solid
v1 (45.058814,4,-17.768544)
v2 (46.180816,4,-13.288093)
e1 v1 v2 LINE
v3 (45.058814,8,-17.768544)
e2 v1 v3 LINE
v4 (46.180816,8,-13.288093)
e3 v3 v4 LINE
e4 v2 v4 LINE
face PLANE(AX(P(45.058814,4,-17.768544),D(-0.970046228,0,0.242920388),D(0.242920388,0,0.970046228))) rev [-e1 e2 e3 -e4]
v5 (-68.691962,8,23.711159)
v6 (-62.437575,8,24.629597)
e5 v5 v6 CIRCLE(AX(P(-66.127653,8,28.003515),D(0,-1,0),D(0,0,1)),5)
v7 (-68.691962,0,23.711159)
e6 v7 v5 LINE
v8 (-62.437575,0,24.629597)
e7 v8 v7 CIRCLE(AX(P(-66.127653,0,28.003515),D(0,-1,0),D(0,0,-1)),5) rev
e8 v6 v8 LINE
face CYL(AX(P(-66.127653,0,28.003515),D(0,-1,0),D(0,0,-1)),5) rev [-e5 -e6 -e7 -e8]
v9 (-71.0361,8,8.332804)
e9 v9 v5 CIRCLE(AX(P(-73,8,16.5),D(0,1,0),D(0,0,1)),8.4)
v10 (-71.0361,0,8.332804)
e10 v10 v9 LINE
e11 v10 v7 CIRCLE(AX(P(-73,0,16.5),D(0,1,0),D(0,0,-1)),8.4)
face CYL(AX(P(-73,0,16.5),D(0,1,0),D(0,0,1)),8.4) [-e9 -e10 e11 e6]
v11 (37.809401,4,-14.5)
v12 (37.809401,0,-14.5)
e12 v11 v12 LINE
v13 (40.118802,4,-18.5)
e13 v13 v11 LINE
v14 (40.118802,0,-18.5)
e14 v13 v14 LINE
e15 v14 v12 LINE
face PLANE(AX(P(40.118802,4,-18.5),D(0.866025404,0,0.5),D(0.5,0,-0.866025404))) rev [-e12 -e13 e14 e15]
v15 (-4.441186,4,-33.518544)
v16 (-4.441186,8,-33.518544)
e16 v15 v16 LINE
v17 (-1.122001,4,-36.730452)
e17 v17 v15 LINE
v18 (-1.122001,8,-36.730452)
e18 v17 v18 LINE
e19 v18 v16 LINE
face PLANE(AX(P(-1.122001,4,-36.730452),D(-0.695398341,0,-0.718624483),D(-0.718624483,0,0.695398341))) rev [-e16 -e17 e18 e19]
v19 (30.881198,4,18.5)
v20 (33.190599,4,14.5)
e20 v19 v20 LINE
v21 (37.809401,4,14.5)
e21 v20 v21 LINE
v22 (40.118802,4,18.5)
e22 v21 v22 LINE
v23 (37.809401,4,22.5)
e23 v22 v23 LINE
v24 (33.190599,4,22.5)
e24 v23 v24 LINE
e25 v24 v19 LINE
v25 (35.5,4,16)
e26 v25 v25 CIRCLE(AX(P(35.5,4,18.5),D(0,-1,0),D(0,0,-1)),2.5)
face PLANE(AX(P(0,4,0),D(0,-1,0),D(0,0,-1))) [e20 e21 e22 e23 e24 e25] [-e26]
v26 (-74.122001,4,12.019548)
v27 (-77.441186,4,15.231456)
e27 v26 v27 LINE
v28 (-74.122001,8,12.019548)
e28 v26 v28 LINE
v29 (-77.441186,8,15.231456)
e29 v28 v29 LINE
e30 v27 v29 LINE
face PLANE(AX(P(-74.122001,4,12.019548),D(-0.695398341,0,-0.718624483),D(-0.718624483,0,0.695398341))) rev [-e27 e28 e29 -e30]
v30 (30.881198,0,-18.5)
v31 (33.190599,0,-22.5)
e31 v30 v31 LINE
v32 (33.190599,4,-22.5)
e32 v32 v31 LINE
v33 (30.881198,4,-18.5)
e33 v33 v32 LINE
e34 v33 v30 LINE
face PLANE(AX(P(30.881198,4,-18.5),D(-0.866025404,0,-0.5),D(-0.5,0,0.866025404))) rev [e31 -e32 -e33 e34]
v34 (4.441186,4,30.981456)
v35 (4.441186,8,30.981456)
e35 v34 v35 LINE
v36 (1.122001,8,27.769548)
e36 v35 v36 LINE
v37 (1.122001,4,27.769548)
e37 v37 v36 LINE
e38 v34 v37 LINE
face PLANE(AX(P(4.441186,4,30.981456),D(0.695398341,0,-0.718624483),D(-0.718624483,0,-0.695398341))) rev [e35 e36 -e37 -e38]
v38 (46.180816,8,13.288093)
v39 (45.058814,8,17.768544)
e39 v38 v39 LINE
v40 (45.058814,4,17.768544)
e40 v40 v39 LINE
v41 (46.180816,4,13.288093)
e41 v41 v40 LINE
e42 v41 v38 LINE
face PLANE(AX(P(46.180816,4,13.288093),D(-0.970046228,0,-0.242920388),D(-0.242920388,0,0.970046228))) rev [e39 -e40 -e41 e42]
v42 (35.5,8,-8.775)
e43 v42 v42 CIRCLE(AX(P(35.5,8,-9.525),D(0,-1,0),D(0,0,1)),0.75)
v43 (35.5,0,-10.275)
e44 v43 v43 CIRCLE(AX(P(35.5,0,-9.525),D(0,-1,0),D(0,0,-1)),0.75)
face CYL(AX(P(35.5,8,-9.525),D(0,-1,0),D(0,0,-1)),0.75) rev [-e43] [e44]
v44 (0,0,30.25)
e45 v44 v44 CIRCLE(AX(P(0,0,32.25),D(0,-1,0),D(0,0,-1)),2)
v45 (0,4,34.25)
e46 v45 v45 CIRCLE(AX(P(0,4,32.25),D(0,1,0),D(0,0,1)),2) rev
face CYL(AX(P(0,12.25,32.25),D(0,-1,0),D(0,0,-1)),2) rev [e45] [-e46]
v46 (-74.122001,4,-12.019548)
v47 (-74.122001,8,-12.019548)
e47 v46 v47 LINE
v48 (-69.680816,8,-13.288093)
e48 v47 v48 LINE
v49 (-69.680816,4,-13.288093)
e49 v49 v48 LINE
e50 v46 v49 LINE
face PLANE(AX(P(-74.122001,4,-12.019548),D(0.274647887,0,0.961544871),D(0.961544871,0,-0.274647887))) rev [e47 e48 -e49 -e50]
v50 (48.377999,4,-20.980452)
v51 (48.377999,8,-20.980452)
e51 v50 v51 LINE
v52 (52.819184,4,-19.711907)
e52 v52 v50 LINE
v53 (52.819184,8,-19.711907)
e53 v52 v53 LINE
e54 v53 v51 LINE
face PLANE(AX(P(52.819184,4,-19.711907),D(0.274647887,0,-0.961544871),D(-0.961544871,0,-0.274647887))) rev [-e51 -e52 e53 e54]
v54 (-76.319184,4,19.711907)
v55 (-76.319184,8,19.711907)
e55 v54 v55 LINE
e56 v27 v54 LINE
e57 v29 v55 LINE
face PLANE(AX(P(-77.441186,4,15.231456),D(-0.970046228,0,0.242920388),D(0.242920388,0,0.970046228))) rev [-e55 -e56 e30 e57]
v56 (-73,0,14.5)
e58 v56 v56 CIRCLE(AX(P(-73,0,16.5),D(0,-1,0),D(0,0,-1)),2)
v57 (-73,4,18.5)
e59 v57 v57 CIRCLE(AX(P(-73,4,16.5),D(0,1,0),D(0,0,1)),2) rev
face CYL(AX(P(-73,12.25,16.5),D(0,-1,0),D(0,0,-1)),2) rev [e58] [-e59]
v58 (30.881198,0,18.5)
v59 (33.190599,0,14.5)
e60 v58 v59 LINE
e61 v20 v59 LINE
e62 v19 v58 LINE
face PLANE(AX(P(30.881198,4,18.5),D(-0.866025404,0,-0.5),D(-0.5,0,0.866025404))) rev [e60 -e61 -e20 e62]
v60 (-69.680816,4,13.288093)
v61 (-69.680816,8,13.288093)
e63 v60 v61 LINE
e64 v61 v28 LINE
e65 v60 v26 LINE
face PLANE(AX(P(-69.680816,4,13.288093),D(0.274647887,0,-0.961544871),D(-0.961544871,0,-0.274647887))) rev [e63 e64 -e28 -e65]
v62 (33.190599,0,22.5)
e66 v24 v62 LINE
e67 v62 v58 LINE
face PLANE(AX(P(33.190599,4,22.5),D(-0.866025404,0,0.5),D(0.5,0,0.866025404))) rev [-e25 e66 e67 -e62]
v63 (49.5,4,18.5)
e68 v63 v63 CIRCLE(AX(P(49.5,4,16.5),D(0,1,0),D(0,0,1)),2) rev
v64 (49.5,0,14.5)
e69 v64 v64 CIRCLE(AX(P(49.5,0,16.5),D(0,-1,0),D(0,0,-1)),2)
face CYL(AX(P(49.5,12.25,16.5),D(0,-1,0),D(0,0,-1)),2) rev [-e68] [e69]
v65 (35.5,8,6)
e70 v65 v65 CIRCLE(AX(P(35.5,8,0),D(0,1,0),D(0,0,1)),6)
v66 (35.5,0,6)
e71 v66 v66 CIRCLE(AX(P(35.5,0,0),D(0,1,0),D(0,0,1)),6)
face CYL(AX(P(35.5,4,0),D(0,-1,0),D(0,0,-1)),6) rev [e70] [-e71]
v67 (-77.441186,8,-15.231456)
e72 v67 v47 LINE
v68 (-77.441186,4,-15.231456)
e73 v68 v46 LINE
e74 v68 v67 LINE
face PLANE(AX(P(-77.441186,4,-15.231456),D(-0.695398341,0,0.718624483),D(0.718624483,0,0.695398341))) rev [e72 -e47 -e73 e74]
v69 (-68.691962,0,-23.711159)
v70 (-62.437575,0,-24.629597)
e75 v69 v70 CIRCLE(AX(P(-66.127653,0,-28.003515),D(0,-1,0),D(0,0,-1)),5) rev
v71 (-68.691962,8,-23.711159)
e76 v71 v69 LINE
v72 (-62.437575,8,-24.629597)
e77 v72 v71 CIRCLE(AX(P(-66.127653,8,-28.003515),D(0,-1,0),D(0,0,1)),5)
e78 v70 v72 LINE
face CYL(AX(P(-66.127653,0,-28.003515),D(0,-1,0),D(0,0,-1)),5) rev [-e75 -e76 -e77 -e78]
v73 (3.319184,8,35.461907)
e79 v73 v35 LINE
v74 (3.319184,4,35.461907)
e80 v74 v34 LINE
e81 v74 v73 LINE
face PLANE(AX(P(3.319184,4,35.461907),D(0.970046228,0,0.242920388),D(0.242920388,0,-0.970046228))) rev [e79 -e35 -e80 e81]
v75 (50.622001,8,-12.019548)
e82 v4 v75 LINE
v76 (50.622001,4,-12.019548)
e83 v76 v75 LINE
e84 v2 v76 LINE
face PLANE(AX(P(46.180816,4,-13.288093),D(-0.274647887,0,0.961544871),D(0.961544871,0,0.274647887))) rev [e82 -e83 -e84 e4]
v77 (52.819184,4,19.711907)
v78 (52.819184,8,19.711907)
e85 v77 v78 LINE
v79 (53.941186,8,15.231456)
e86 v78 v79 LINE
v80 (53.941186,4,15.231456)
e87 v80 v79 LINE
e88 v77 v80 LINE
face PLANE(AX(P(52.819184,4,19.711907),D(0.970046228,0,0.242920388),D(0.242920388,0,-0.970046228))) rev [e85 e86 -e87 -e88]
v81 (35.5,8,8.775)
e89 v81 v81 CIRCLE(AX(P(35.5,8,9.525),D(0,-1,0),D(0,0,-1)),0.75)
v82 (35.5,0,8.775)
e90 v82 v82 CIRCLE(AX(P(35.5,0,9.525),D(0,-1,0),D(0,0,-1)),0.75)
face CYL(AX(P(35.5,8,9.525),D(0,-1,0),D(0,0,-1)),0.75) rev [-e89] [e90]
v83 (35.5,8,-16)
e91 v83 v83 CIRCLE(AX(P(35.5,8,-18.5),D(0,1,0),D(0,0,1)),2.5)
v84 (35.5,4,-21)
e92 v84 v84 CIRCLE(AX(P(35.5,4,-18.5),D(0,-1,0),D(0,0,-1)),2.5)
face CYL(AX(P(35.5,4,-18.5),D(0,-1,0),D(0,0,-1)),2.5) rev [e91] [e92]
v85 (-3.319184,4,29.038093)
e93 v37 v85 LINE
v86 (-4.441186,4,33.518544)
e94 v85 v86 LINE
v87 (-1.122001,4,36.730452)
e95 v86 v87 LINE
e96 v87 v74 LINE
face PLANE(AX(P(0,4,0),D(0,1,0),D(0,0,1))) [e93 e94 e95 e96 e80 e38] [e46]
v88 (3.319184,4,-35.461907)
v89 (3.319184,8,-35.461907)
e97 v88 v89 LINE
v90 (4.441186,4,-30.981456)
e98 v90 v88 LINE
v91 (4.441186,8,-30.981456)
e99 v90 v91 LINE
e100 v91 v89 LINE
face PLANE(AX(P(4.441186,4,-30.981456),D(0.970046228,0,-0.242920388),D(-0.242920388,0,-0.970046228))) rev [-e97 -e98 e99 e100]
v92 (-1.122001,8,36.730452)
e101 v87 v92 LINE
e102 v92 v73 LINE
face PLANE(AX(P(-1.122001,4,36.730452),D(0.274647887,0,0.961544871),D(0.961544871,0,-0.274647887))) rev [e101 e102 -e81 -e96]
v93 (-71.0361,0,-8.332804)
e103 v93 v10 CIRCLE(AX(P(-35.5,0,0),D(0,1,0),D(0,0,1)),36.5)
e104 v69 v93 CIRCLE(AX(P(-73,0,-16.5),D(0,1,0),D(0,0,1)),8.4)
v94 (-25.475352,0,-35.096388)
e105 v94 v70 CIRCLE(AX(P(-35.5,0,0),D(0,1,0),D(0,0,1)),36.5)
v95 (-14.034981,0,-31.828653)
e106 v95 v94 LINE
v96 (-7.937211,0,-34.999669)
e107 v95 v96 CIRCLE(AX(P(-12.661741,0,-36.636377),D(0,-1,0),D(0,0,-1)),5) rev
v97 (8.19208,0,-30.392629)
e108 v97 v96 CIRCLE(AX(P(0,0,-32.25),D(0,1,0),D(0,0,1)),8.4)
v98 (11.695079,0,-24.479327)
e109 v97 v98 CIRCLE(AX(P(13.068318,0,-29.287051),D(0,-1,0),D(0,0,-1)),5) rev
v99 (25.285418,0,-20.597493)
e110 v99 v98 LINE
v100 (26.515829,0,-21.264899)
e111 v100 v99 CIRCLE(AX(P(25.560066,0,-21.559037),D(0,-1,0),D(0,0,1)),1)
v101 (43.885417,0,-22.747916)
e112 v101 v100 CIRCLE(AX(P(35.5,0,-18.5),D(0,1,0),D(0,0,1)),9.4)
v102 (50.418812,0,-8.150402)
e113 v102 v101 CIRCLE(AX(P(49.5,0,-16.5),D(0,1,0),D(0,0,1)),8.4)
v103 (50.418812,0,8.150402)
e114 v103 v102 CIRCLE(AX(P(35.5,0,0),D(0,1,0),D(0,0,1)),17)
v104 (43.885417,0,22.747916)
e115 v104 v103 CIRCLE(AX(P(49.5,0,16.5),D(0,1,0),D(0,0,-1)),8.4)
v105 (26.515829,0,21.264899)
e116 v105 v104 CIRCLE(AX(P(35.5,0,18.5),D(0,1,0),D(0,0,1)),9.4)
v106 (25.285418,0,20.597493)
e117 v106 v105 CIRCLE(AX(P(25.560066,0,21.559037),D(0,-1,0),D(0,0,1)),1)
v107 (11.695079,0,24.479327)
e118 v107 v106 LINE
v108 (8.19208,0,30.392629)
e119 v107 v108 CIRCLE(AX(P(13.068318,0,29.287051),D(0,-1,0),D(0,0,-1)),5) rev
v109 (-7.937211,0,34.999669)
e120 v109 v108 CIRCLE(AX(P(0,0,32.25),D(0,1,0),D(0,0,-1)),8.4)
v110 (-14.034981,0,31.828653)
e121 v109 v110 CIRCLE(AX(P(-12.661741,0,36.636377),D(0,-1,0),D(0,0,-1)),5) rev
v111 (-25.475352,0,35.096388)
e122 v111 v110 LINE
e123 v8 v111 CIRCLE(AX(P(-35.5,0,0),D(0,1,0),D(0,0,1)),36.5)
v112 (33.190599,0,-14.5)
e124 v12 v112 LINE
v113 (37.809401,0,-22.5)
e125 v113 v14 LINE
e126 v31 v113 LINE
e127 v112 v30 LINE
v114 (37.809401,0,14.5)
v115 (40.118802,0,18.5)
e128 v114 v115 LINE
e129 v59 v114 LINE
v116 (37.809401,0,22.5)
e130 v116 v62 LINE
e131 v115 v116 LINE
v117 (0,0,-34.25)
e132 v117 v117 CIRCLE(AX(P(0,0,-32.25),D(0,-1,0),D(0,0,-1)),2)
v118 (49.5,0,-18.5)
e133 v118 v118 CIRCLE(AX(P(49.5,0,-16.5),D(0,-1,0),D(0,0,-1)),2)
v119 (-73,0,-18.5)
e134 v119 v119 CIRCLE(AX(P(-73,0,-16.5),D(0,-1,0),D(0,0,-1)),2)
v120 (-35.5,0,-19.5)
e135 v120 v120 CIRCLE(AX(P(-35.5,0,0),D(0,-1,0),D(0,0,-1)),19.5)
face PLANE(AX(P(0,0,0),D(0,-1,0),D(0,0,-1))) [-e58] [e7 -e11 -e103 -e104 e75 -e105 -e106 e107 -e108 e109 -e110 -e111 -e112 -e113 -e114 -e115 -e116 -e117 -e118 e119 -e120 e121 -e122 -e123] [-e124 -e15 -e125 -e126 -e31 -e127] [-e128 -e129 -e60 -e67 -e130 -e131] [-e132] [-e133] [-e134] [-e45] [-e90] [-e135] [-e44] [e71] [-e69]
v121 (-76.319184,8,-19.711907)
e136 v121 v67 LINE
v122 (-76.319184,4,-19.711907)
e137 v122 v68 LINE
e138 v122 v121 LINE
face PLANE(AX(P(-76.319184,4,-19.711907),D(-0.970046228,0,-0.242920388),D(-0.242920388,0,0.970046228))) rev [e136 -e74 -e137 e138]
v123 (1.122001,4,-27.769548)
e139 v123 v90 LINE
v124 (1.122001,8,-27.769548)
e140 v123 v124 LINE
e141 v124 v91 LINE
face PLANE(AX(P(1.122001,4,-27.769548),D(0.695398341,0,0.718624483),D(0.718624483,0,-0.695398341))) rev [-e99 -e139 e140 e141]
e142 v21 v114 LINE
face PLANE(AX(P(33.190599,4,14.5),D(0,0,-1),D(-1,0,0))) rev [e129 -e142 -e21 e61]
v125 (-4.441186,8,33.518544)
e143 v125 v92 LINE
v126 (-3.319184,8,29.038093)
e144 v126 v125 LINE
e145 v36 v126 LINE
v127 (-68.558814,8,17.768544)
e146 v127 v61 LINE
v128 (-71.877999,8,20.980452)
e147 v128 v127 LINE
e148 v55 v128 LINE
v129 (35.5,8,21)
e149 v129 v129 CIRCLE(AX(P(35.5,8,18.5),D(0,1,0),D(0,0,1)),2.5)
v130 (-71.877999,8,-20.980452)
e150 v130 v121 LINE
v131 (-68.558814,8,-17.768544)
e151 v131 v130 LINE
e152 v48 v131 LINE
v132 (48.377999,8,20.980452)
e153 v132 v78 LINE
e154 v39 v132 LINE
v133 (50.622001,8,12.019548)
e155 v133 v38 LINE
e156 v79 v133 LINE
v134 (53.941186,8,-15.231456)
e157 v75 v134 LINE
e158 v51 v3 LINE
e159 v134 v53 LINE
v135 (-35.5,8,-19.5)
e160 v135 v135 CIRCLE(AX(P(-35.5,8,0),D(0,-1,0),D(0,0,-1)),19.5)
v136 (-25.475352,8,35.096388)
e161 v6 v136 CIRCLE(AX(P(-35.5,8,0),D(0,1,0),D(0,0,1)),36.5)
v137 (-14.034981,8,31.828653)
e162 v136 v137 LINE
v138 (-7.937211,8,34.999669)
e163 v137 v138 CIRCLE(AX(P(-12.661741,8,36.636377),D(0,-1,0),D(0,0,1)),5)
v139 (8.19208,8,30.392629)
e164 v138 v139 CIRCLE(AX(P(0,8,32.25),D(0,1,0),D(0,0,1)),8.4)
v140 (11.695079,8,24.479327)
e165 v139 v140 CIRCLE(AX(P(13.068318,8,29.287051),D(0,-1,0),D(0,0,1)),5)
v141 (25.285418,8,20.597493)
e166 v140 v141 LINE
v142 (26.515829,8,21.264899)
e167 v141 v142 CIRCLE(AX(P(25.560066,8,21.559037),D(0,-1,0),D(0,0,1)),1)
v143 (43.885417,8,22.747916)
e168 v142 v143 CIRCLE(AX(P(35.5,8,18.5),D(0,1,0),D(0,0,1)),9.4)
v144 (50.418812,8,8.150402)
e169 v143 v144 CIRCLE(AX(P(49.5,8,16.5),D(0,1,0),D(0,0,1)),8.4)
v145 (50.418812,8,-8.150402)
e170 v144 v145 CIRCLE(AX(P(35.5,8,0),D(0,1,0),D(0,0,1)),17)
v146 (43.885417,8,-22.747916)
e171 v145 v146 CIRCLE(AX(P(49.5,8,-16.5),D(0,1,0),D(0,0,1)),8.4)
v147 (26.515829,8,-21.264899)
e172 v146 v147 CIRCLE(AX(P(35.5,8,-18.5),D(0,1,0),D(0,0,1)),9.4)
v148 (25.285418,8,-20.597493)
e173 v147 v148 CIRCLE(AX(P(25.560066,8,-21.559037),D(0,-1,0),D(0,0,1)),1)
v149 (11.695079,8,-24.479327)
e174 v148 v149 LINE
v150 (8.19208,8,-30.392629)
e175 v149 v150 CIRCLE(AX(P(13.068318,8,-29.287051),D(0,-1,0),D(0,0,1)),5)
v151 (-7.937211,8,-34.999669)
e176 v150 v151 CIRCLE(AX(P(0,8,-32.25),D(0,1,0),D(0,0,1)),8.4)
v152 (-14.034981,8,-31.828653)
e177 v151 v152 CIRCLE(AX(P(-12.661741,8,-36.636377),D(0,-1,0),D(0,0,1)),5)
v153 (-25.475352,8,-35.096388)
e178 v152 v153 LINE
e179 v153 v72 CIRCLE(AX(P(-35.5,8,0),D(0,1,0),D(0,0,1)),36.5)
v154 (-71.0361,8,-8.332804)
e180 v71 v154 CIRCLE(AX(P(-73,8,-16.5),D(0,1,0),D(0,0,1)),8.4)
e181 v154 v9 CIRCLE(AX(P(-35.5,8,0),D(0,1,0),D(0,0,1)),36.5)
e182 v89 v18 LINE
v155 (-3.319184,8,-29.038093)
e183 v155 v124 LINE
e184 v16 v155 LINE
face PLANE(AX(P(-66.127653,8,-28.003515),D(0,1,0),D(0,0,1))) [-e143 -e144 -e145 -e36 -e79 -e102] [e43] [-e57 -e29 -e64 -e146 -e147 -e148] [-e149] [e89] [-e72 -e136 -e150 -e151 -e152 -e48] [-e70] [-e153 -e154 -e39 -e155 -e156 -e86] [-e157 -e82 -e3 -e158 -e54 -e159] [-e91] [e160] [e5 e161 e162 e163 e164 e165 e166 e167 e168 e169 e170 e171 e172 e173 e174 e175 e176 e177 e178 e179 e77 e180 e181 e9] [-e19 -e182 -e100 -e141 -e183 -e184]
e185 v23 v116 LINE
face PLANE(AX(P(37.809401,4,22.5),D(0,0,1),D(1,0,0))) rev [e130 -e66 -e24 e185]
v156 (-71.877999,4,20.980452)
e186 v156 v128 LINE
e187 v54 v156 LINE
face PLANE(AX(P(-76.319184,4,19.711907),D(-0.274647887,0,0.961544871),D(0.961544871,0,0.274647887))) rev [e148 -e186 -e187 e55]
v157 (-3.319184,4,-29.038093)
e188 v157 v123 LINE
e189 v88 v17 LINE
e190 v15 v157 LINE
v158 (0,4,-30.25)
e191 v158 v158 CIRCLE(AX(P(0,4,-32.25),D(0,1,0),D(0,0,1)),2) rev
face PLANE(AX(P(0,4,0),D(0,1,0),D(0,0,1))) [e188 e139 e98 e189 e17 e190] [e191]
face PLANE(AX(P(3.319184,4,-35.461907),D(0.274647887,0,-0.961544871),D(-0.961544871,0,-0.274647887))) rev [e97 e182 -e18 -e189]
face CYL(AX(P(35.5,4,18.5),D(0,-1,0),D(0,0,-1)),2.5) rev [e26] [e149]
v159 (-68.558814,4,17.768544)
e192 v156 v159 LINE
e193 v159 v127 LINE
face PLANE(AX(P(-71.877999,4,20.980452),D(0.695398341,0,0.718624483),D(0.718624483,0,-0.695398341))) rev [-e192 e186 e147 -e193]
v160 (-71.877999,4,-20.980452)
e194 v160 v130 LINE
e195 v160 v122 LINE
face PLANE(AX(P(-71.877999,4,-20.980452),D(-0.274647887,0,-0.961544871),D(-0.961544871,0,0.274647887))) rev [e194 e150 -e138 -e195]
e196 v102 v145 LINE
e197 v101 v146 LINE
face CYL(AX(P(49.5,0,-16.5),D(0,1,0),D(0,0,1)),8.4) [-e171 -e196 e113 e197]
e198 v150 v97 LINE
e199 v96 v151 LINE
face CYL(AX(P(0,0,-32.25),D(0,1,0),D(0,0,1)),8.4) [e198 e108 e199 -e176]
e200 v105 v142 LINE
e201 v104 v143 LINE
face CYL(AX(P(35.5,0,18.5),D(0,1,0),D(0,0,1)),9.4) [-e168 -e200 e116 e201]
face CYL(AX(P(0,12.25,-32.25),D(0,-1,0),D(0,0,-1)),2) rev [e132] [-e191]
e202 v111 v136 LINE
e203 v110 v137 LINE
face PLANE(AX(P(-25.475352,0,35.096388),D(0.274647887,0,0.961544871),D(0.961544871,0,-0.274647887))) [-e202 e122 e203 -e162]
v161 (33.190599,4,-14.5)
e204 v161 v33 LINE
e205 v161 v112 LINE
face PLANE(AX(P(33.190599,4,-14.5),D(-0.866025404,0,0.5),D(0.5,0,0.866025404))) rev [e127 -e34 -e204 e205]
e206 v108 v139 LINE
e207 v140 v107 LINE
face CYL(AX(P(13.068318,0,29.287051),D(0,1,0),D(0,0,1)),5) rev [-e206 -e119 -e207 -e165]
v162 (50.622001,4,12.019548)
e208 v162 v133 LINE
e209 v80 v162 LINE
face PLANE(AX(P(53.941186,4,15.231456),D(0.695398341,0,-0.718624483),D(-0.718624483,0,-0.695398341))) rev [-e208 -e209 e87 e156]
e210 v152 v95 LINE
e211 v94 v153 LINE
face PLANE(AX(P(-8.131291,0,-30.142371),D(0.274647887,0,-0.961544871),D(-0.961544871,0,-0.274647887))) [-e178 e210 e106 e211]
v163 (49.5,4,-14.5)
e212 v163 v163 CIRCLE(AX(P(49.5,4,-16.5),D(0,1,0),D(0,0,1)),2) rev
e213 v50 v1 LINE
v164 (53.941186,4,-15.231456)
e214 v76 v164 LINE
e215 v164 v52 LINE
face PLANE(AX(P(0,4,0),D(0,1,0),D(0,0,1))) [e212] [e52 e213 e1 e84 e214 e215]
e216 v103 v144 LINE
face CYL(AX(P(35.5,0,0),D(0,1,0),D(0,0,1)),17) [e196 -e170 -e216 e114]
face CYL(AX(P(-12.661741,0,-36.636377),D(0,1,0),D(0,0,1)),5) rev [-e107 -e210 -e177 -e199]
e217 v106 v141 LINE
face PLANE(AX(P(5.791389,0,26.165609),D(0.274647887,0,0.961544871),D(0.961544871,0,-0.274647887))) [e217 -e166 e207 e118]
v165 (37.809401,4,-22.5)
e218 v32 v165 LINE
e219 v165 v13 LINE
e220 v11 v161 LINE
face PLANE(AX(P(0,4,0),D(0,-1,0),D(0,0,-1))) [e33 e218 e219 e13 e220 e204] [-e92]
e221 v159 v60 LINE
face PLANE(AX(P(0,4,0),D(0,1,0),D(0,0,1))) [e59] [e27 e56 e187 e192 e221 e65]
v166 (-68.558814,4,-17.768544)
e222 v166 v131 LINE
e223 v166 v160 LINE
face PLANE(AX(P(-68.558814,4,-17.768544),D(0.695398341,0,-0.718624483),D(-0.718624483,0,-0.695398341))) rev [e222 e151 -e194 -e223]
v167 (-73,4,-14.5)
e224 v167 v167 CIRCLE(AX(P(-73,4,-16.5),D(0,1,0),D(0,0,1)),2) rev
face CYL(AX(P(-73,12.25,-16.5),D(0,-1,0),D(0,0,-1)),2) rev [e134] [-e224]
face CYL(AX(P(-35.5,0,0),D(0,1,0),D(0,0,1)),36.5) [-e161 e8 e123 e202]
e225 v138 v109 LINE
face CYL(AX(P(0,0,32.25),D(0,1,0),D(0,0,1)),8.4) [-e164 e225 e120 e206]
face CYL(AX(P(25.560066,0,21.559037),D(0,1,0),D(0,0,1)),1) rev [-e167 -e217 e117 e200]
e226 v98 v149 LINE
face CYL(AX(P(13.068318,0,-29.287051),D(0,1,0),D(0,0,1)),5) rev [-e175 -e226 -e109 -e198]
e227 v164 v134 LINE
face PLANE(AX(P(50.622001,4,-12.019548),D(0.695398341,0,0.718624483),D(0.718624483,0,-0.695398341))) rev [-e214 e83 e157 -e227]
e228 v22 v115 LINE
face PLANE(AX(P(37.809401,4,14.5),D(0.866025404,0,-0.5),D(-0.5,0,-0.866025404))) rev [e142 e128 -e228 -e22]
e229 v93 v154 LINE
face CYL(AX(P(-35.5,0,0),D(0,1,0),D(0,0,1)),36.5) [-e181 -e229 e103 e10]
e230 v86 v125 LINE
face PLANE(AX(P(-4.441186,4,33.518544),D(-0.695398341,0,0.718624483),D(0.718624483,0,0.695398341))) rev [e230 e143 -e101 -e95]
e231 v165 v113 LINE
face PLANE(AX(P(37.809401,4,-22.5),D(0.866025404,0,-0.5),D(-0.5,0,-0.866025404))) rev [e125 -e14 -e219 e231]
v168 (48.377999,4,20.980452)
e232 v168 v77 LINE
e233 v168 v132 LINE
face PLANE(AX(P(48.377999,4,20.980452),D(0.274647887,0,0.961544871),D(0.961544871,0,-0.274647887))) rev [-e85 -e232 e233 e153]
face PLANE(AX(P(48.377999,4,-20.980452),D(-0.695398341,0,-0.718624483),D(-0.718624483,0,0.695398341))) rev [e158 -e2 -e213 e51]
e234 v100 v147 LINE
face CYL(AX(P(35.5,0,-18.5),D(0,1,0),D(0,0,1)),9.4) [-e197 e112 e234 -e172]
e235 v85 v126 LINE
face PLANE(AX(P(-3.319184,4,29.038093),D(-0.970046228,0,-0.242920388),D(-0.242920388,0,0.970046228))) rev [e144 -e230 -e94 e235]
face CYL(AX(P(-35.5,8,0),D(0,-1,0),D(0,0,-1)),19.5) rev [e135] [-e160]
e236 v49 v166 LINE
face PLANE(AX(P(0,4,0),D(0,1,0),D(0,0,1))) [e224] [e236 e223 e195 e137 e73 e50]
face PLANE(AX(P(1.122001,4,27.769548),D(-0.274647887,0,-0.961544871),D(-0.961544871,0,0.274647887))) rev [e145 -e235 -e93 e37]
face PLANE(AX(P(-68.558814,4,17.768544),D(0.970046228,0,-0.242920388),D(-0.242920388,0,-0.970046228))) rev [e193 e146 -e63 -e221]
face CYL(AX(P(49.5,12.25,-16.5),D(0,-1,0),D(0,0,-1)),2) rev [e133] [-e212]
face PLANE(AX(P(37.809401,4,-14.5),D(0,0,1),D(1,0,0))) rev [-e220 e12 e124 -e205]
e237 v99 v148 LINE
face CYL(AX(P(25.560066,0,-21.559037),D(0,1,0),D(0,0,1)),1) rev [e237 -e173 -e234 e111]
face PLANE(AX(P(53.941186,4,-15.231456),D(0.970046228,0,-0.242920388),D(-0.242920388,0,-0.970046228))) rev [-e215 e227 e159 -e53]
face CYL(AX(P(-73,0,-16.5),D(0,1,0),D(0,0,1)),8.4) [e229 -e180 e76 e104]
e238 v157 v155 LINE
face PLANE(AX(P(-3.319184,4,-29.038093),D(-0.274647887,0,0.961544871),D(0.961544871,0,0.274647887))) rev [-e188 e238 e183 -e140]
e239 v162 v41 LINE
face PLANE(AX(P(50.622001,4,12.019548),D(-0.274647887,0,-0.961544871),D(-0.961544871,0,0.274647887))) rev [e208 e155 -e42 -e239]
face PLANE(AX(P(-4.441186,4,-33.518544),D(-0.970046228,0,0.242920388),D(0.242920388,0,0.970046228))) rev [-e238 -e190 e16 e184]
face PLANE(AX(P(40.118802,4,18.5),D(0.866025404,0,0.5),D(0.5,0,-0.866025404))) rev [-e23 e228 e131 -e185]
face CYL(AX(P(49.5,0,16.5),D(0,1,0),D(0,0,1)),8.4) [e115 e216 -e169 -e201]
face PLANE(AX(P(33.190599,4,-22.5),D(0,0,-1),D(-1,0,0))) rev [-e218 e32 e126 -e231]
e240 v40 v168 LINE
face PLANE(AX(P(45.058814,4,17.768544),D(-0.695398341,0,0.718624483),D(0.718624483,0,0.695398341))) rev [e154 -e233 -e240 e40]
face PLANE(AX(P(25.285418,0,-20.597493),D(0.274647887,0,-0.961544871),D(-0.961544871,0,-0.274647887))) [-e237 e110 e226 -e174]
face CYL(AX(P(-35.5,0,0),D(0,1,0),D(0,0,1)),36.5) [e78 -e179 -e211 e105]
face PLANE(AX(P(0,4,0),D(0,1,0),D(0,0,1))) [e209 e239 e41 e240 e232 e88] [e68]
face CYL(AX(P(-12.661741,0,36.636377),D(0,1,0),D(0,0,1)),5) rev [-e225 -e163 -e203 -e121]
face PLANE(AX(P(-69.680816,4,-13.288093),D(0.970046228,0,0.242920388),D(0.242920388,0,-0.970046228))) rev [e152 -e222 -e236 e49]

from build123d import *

# Parameters (mm, degrees)
SKETCH1_W               = 200
SKETCH1_H               = 150
SKETCH1_R               = 6
SKETCH1_R_2             = 13.5
SKETCH1_R_3             = 2
SKETCH1_R_4             = 2.5
BOSS_EXTRUDE1_DEPTH     = 4
SKETCH3_W               = 200
SKETCH3_H               = 150
BOSS_EXTRUDE2_DEPTH     = 8.25
SKETCH6_R               = 5.4
CUT_EXTRUDE2_DEPTH      = 8.25
FILLET1_R               = 2.5
FILLET2_R               = 5
SKETCH2_R               = 4.4
SKETCH2_R_2             = 5.4
CUT_EXTRUDE1_DEPTH      = 2
CUT_EXTRUDE3_DEPTH      = 126.598815828
CUT_EXTRUDE3_DEPTH_BACK = 126.598815828
SKETCH8_R               = 2
CUT_EXTRUDE6_DEPTH      = 126.598815818
CUT_EXTRUDE6_DEPTH_BACK = 126.598815818
SKETCH13_OUTSIDE_W      = 252.06
SKETCH13_OUTSIDE_H      = 202.06
FILLET4_R               = 5
CUT_EXTRUDE7_START      = -10.25
CUT_EXTRUDE7_DEPTH      = 10.25
SKETCH17_R              = 2
BOSS_EXTRUDE3_DEPTH     = 2
SKETCH18_R              = 13.5
SKETCH18_R_2            = 2
SKETCH18_R_3            = 2.5
SKETCH18_R_4            = 6
BOSS_EXTRUDE4_DEPTH     = 6
CUT_EXTRUDE8_DEPTH      = 92.336643939
CUT_EXTRUDE8_DEPTH_BACK = 92.336643939
SKETCH19_R              = 19.5
SKETCH19_R_2            = 0.75
CUT_EXTRUDE9_DEPTH      = 4
CUT_EXTRUDE10_DEPTH     = 4


with BuildPart() as part:
    # Sketch1 → Boss-Extrude1 (new body)
    with BuildSketch(Plane(origin=(0, 0, 0), x_dir=(1, 0, 0), z_dir=(0, 1, 0))):
        Rectangle(SKETCH1_W, SKETCH1_H)
        with Locations(Location((35.5, 0, 0), (0, 0, 270))):
            Circle(SKETCH1_R, mode=Mode.SUBTRACT)
        with Locations(Location((-35.5, 0, 0), (0, 0, 270))):
            Circle(SKETCH1_R_2, mode=Mode.SUBTRACT)
        with Locations(Location((-60.5, 0, 0), (0, 0, 270))):
            Circle(SKETCH1_R_3, mode=Mode.SUBTRACT)
        with Locations(Location((-35.5, 25, 0), (0, 0, 270))):
            Circle(SKETCH1_R_3, mode=Mode.SUBTRACT)
        with Locations(Location((-10.5, 0, 0), (0, 0, 270))):
            Circle(SKETCH1_R_3, mode=Mode.SUBTRACT)
        with Locations(Location((-35.5, -25, 0), (0, 0, 270))):
            Circle(SKETCH1_R_3, mode=Mode.SUBTRACT)
        with Locations(Location((35.5, 18.5, 0), (0, 0, 270))):
            Circle(SKETCH1_R_4, mode=Mode.SUBTRACT)
        with Locations(Location((35.5, -18.5, 0), (0, 0, 90))):
            Circle(SKETCH1_R_4, mode=Mode.SUBTRACT)
        Polygon((4.517711304, -15.136418767), (0.159242352, 0.258507293), (4.681501882, 1.538807548), (9.039970835, -13.856118512), (9.584779454, -15.78048427), (5.062519924, -17.060784524), align=None, mode=Mode.SUBTRACT)
    extrude(amount=BOSS_EXTRUDE1_DEPTH)

    # Sketch3 → Boss-Extrude2 (add)
    with BuildSketch(Plane(origin=(0, 4, 0), x_dir=(1, 0, 0), z_dir=(0, 1, 0))):
        Rectangle(SKETCH3_W, SKETCH3_H)
        with BuildLine():
            Line((-26.573943662, 31.250208291), (39.070422535, 12.500083317))
            ThreePointArc((39.070422535, 12.500083317), (48.5, 0), (39.070422535, -12.500083317))
            Line((39.070422535, -12.500083317), (-26.573943662, -31.250208291))
            ThreePointArc((-26.573943662, -31.250208291), (-68, 0), (-26.573943662, 31.250208291))
        make_face(mode=Mode.SUBTRACT)
    extrude(amount=BOSS_EXTRUDE2_DEPTH)

    # Sketch6 → Cut-Extrude2 (cut)
    with BuildSketch(Plane(origin=(0, 12.25, 0), x_dir=(1, 0, 0), z_dir=(0, 1, 0))):
        with Locations((35.5, 18.5)):
            Circle(SKETCH6_R)
        with Locations((35.5, -18.5)):
            Circle(SKETCH6_R)
    extrude(amount=-CUT_EXTRUDE2_DEPTH, mode=Mode.SUBTRACT)

    # Fillet1
    # the kernel refuses this fillet: 2.5 mm, written as the material it adds along each edge
    with BuildSketch(Plane(origin=(9.584779454, 0, 15.78048427), x_dir=(-0.9621828787440704, 0, 0.2724043095323078), z_dir=(0, 1, 0)), Plane(origin=(5.062519924, 0, 17.060784524), x_dir=(-0.2724043095323296, 0, -0.9621828787440644), z_dir=(0, 1, 0)), Plane(origin=(4.681501882, 0, -1.538807548), x_dir=(0.2724043095323091, 0, 0.96218287874407), z_dir=(0, 1, 0))) as fillet1_piece_1:
        with BuildLine():
            CenterArc((FILLET1_R, -FILLET1_R), FILLET1_R, 90, 90)
            Line((0, -FILLET1_R), (0, 0))
            Line((0, 0), (FILLET1_R, 0))
        make_face()
    extrude(amount=4)
    with BuildSketch(Plane(origin=(0.159242352, 0, -0.258507293), x_dir=(0.272404309532306, 0, 0.962182878744071), z_dir=(0, 1, 0))) as fillet1_piece_2:
        with BuildLine():
            CenterArc((FILLET1_R, FILLET1_R), FILLET1_R, 180, 90)
            Line((0, FILLET1_R), (0, 0))
            Line((0, 0), (FILLET1_R, 0))
        make_face()
    extrude(amount=4)

    # Fillet2
    fillet2_edges = [part.edges().sort_by_distance(p)[0] for p in [
        (31.784909874, 8.125, 14.581058133),
        (36.584743308, 8.125, 13.210072594),
        (36.584743308, 8.125, -13.210072594),
        (31.784909874, 8.125, -14.581058133),
    ]]
    fillet(fillet2_edges, radius=FILLET2_R)

    # Sketch2 → Cut-Extrude1 (cut)
    with BuildSketch(Plane(origin=(0, 4, 0), x_dir=(1, 0, 0), z_dir=(0, 1, 0))):
        with Locations(Location((-35.5, 25, 0), (0, 0, 270))):
            Circle(SKETCH2_R)
        with Locations(Location((-10.5, 0, 0), (0, 0, 270))):
            Circle(SKETCH2_R)
        with Locations(Location((-35.5, -25, 0), (0, 0, 270))):
            Circle(SKETCH2_R)
        with Locations(Location((-60.5, 0, 0), (0, 0, 270))):
            Circle(SKETCH2_R)
        with Locations(Location((35.5, 18.5, 0), (0, 0, 270))):
            Circle(SKETCH2_R_2)
        with Locations(Location((35.5, -18.5, 0), (0, 0, 197.105868404))):
            Circle(SKETCH2_R_2)
    extrude(amount=-CUT_EXTRUDE1_DEPTH, mode=Mode.SUBTRACT)

    # Sketch8 → Cut-Extrude3 (cut, two sides: drawn at the far end of the back side and taken through both)
    with BuildSketch(Plane.XZ.offset(-CUT_EXTRUDE3_DEPTH_BACK)):
        with Locations(Location((49.5, 16.5, 0), (0, 0, 270))):
            Circle(SKETCH8_R)
        with Locations(Location((-73, 16.5, 0), (0, 0, 270))):
            Circle(SKETCH8_R)
        with Locations(Location((0, 32.25, 0), (0, 0, 270))):
            Circle(SKETCH8_R)
        with Locations(Location((-73, -16.5, 0), (0, 0, 270))):
            Circle(SKETCH8_R)
        with Locations(Location((0, -32.25, 0), (0, 0, 270))):
            Circle(SKETCH8_R)
        with Locations(Location((49.5, -16.5, 0), (0, 0, 270))):
            Circle(SKETCH8_R)
    extrude(amount=CUT_EXTRUDE3_DEPTH + CUT_EXTRUDE3_DEPTH_BACK, mode=Mode.SUBTRACT)

    # Sketch13 outside → Cut-Extrude6 (cut, two sides: drawn at the far end of the back side and taken through both)
    with BuildSketch(Plane(origin=(0, 12.25, 0), x_dir=(1, 0, 0), z_dir=(0, 1, 0)).offset(-CUT_EXTRUDE6_DEPTH_BACK)):
        Rectangle(SKETCH13_OUTSIDE_W, SKETCH13_OUTSIDE_H)
        with BuildLine():
            Line((-8.131291348, 30.142370761), (-25.475352113, 35.096387773))
            ThreePointArc((-25.475352113, 35.096387773), (-47.910899113, 34.325203324), (-65.651791262, 20.569868344))
            ThreePointArc((-65.651791262, 20.569868344), (-80.688646272, 19.88300436), (-71.036099712, 8.332803684))
            ThreePointArc((-71.036099712, 8.332803684), (-72, 0), (-71.036099712, -8.332803684))
            ThreePointArc((-71.036099712, -8.332803684), (-80.688646272, -19.88300436), (-65.651791262, -20.569868344))
            ThreePointArc((-65.651791262, -20.569868344), (-47.910899113, -34.325203324), (-25.475352113, -35.096387773))
            Line((-25.475352113, -35.096387773), (-8.131291348, -30.142370761))
            ThreePointArc((-8.131291348, -30.142370761), (2.307042254, -40.326976912), (5.791389082, -26.165609111))
            Line((5.791389082, -26.165609111), (25.285418022, -20.597492606))
            ThreePointArc((25.285418022, -20.597492606), (26.036864948, -20.680025145), (26.515828803, -21.264899257))
            ThreePointArc((26.515828803, -21.264899257), (34.700336728, -27.865924335), (43.885416553, -22.74791587))
            ThreePointArc((43.885416553, -22.74791587), (57.167099831, -19.931556524), (50.418811796, -8.150402112))
            ThreePointArc((50.418811796, -8.150402112), (52.5, 0), (50.418811796, 8.150402112))
            ThreePointArc((50.418811796, 8.150402112), (57.167099831, 19.931556524), (43.885416553, 22.74791587))
            ThreePointArc((43.885416553, 22.74791587), (34.700336728, 27.865924335), (26.515828803, 21.264899257))
            ThreePointArc((26.515828803, 21.264899257), (26.036864948, 20.680025145), (25.285418022, 20.597492606))
            Line((25.285418022, 20.597492606), (5.791389082, 26.165609111))
            ThreePointArc((5.791389082, 26.165609111), (2.307042254, 40.326976912), (-8.131291348, 30.142370761))
        make_face(mode=Mode.SUBTRACT)
    extrude(amount=CUT_EXTRUDE6_DEPTH + CUT_EXTRUDE6_DEPTH_BACK, mode=Mode.SUBTRACT)

    # Fillet4
    fillet4_edges = [part.edges().sort_by_distance(p)[0] for p in [
        (-65.651791262, 6.125, -20.569868344),
        (-8.131291348, 6.125, -30.142370761),
        (5.791389082, 6.125, -26.165609111),
        (5.791389082, 6.125, 26.165609111),
        (-8.131291348, 6.125, 30.142370761),
        (-65.651791262, 6.125, 20.569868344),
    ]]
    fillet(fillet4_edges, radius=FILLET4_R)

    # Sketch16 → Cut-Extrude7 (cut)
    with BuildSketch(Plane(origin=(0, 12.25, 0), x_dir=(1, 0, 0), z_dir=(0, 1, 0)).offset(CUT_EXTRUDE7_START)):
        with BuildLine():
            Line((-25.475352113, -35.096387773), (-14.034980843, -31.828652803))
            ThreePointArc((-14.034980843, -31.828652803), (-10.35487685, -32.200345605), (-7.937211031, -34.999669261))
            ThreePointArc((-7.937211031, -34.999669261), (2.307042254, -40.326976912), (8.192079949, -30.392629249))
            ThreePointArc((8.192079949, -30.392629249), (8.766483762, -26.738675062), (11.695078578, -24.479327069))
            Line((11.695078578, -24.479327069), (25.285418022, -20.597492606))
            ThreePointArc((25.285418022, -20.597492606), (26.036864948, -20.680025145), (26.515828803, -21.264899257))
            ThreePointArc((26.515828803, -21.264899257), (34.700336728, -27.865924335), (43.885416553, -22.74791587))
            ThreePointArc((43.885416553, -22.74791587), (57.167099831, -19.931556524), (50.418811796, -8.150402112))
            ThreePointArc((50.418811796, -8.150402112), (52.5, 0), (50.418811796, 8.150402112))
            ThreePointArc((50.418811796, 8.150402112), (57.167099831, 19.931556524), (43.885416553, 22.74791587))
            ThreePointArc((43.885416553, 22.74791587), (34.700336728, 27.865924335), (26.515828803, 21.264899257))
            ThreePointArc((26.515828803, 21.264899257), (26.036864948, 20.680025145), (25.285418022, 20.597492606))
            Line((25.285418022, 20.597492606), (11.695078578, 24.479327069))
            ThreePointArc((11.695078578, 24.479327069), (8.766483762, 26.738675062), (8.192079949, 30.392629249))
            ThreePointArc((8.192079949, 30.392629249), (2.307042254, 40.326976912), (-7.937211031, 34.999669261))
            ThreePointArc((-7.937211031, 34.999669261), (-10.35487685, 32.200345605), (-14.034980843, 31.828652803))
            Line((-14.034980843, 31.828652803), (-25.475352113, 35.096387773))
            ThreePointArc((-25.475352113, 35.096387773), (-45.44485792, 35.119080298), (-62.437574746, 24.629597374))
            ThreePointArc((-62.437574746, 24.629597374), (-65.401208588, 23.05656851), (-68.691961882, 23.711158546))
            ThreePointArc((-68.691961882, 23.711158546), (-81.304080467, 17.765799193), (-71.036099712, 8.332803684))
            ThreePointArc((-71.036099712, 8.332803684), (-72, 0), (-71.036099712, -8.332803684))
            ThreePointArc((-71.036099712, -8.332803684), (-81.304080467, -17.765799193), (-68.691961882, -23.711158546))
            ThreePointArc((-68.691961882, -23.711158546), (-65.401208588, -23.05656851), (-62.437574746, -24.629597374))
            ThreePointArc((-62.437574746, -24.629597374), (-45.44485792, -35.119080298), (-25.475352113, -35.096387773))
        make_face()
    extrude(amount=CUT_EXTRUDE7_DEPTH, mode=Mode.SUBTRACT)

    # Sketch17 → Boss-Extrude3 (add)
    with BuildSketch(Plane.XZ):
        with Locations((-10.5, 0)):
            Circle(SKETCH17_R)
        with Locations((-35.5, -25)):
            Circle(SKETCH17_R)
        with Locations((-35.5, 25)):
            Circle(SKETCH17_R)
        with Locations((-60.5, 0)):
            Circle(SKETCH17_R)
        with BuildLine():
            Line((4.38150915, 14.655327328), (0.840253126, 2.146949904))
            ThreePointArc((0.840253126, 2.146949904), (1.027633585, 0.312624087), (2.421599042, -0.894323694))
            ThreePointArc((2.421599042, -0.894323694), (4.241377267, -0.597221274), (5.362512656, 0.866649649))
            Line((5.362512656, 0.866649649), (8.90376868, 13.375027073))
            ThreePointArc((8.90376868, 13.375027073), (8.71638822, 15.209352889), (7.322422764, 16.41630067))
            ThreePointArc((7.322422764, 16.41630067), (5.502644538, 16.11919825), (4.38150915, 14.655327328))
        make_face()
    extrude(amount=-BOSS_EXTRUDE3_DEPTH)

    # Sketch18 → Boss-Extrude4 (add)
    with BuildSketch(Plane(origin=(0, 2, 0), x_dir=(1, 0, 0), z_dir=(0, 1, 0))):
        with BuildLine():
            Line((-25.475352113, -35.096387773), (-14.034980843, -31.828652803))
            ThreePointArc((-14.034980843, -31.828652803), (-10.35487685, -32.200345605), (-7.937211031, -34.999669261))
            ThreePointArc((-7.937211031, -34.999669261), (2.307042254, -40.326976912), (8.192079949, -30.392629249))
            ThreePointArc((8.192079949, -30.392629249), (8.766483762, -26.738675062), (11.695078578, -24.479327069))
            Line((11.695078578, -24.479327069), (25.285418022, -20.597492606))
            ThreePointArc((25.285418022, -20.597492606), (26.036864948, -20.680025145), (26.515828803, -21.264899257))
            ThreePointArc((26.515828803, -21.264899257), (34.700336728, -27.865924335), (43.885416553, -22.74791587))
            ThreePointArc((43.885416553, -22.74791587), (57.167099831, -19.931556524), (50.418811796, -8.150402112))
            ThreePointArc((50.418811796, -8.150402112), (52.5, 0), (50.418811796, 8.150402112))
            ThreePointArc((50.418811796, 8.150402112), (57.167099831, 19.931556524), (43.885416553, 22.74791587))
            ThreePointArc((43.885416553, 22.74791587), (34.700336728, 27.865924335), (26.515828803, 21.264899257))
            ThreePointArc((26.515828803, 21.264899257), (26.036864948, 20.680025145), (25.285418022, 20.597492606))
            Line((25.285418022, 20.597492606), (11.695078578, 24.479327069))
            ThreePointArc((11.695078578, 24.479327069), (8.766483762, 26.738675062), (8.192079949, 30.392629249))
            ThreePointArc((8.192079949, 30.392629249), (2.307042254, 40.326976912), (-7.937211031, 34.999669261))
            ThreePointArc((-7.937211031, 34.999669261), (-10.35487685, 32.200345605), (-14.034980843, 31.828652803))
            Line((-14.034980843, 31.828652803), (-25.475352113, 35.096387773))
            ThreePointArc((-25.475352113, 35.096387773), (-45.44485792, 35.119080298), (-62.437574746, 24.629597374))
            ThreePointArc((-62.437574746, 24.629597374), (-65.401208588, 23.05656851), (-68.691961882, 23.711158546))
            ThreePointArc((-68.691961882, 23.711158546), (-81.304080467, 17.765799193), (-71.036099712, 8.332803684))
            ThreePointArc((-71.036099712, 8.332803684), (-72, 0), (-71.036099712, -8.332803684))
            ThreePointArc((-71.036099712, -8.332803684), (-81.304080467, -17.765799193), (-68.691961882, -23.711158546))
            ThreePointArc((-68.691961882, -23.711158546), (-65.401208588, -23.05656851), (-62.437574746, -24.629597374))
            ThreePointArc((-62.437574746, -24.629597374), (-45.44485792, -35.119080298), (-25.475352113, -35.096387773))
        make_face()
        with Locations(Location((-35.5, 0, 0), (0, 0, 270))):
            Circle(SKETCH18_R, mode=Mode.SUBTRACT)
        with Locations(Location((0, 32.25, 0), (0, 0, 90))):
            Circle(SKETCH18_R_2, mode=Mode.SUBTRACT)
        with Locations(Location((-73, 16.5, 0), (0, 0, 90))):
            Circle(SKETCH18_R_2, mode=Mode.SUBTRACT)
        with Locations(Location((-73, -16.5, 0), (0, 0, 90))):
            Circle(SKETCH18_R_2, mode=Mode.SUBTRACT)
        with Locations(Location((0, -32.25, 0), (0, 0, 90))):
            Circle(SKETCH18_R_2, mode=Mode.SUBTRACT)
        with Locations(Location((35.5, -18.5, 0), (0, 0, 90))):
            Circle(SKETCH18_R_3, mode=Mode.SUBTRACT)
        with Locations(Location((35.5, 0, 0), (0, 0, 270))):
            Circle(SKETCH18_R_4, mode=Mode.SUBTRACT)
        with Locations(Location((49.5, -16.5, 0), (0, 0, 90))):
            Circle(SKETCH18_R_2, mode=Mode.SUBTRACT)
        with Locations(Location((35.5, 18.5, 0), (0, 0, 270))):
            Circle(SKETCH18_R_3, mode=Mode.SUBTRACT)
        with Locations(Location((49.5, 16.5, 0), (0, 0, 90))):
            Circle(SKETCH18_R_2, mode=Mode.SUBTRACT)
    extrude(amount=BOSS_EXTRUDE4_DEPTH)

    # Sketch19 → Cut-Extrude8 (cut, two sides: drawn at the far end of the back side and taken through both)
    with BuildSketch(Plane.XZ.offset(-CUT_EXTRUDE8_DEPTH_BACK)):
        with Locations(Location((-35.5, 0, 0), (0, 0, 270))):
            Circle(SKETCH19_R)
        with Locations(Location((35.5, 9.525, 0), (0, 0, 270))):
            Circle(SKETCH19_R_2)
        with Locations(Location((35.5, -9.525, 0), (0, 0, 270))):
            Circle(SKETCH19_R_2)
    extrude(amount=CUT_EXTRUDE8_DEPTH + CUT_EXTRUDE8_DEPTH_BACK, mode=Mode.SUBTRACT)

    # Sketch20 → Cut-Extrude9 (cut)
    with BuildSketch(Plane.XZ):
        Polygon((40.118802154, 18.5), (37.809401077, 22.5), (33.190598923, 22.5), (30.881197846, 18.5), (33.190598923, 14.5), (37.809401077, 14.5), align=None)
        Polygon((40.118802154, -18.5), (37.809401077, -14.5), (33.190598923, -14.5), (30.881197846, -18.5), (33.190598923, -22.5), (37.809401077, -22.5), align=None)
    extrude(amount=-CUT_EXTRUDE9_DEPTH, mode=Mode.SUBTRACT)

    # Sketch21 → Cut-Extrude10 (cut)
    with BuildSketch(Plane(origin=(0, 8, 0), x_dir=(1, 0, 0), z_dir=(0, 1, 0))):
        Polygon((-69.680815691, 13.288092645), (-68.558814481, 17.768544253), (-71.87799879, 20.980451609), (-76.319184309, 19.711907355), (-77.441185519, 15.231455747), (-74.12200121, 12.019548391), align=None)
        Polygon((-69.680815691, -13.288092645), (-74.12200121, -12.019548391), (-77.441185519, -15.231455747), (-76.319184309, -19.711907355), (-71.87799879, -20.980451609), (-68.558814481, -17.768544253), align=None)
        Polygon((4.441185519, 30.981455747), (3.319184309, 35.461907355), (-1.12200121, 36.730451609), (-4.441185519, 33.518544253), (-3.319184309, 29.038092645), (1.12200121, 27.769548391), align=None)
        Polygon((50.62200121, 12.019548391), (53.941185519, 15.231455747), (52.819184309, 19.711907355), (48.37799879, 20.980451609), (45.058814481, 17.768544253), (46.180815691, 13.288092645), align=None)
        Polygon((53.941185519, -15.231455747), (50.62200121, -12.019548391), (46.180815691, -13.288092645), (45.058814481, -17.768544253), (48.37799879, -20.980451609), (52.819184309, -19.711907355), align=None)
        Polygon((4.441185519, -30.981455747), (1.12200121, -27.769548391), (-3.319184309, -29.038092645), (-4.441185519, -33.518544253), (-1.12200121, -36.730451609), (3.319184309, -35.461907355), align=None)
    extrude(amount=-CUT_EXTRUDE10_DEPTH, mode=Mode.SUBTRACT)


solid = part.part
